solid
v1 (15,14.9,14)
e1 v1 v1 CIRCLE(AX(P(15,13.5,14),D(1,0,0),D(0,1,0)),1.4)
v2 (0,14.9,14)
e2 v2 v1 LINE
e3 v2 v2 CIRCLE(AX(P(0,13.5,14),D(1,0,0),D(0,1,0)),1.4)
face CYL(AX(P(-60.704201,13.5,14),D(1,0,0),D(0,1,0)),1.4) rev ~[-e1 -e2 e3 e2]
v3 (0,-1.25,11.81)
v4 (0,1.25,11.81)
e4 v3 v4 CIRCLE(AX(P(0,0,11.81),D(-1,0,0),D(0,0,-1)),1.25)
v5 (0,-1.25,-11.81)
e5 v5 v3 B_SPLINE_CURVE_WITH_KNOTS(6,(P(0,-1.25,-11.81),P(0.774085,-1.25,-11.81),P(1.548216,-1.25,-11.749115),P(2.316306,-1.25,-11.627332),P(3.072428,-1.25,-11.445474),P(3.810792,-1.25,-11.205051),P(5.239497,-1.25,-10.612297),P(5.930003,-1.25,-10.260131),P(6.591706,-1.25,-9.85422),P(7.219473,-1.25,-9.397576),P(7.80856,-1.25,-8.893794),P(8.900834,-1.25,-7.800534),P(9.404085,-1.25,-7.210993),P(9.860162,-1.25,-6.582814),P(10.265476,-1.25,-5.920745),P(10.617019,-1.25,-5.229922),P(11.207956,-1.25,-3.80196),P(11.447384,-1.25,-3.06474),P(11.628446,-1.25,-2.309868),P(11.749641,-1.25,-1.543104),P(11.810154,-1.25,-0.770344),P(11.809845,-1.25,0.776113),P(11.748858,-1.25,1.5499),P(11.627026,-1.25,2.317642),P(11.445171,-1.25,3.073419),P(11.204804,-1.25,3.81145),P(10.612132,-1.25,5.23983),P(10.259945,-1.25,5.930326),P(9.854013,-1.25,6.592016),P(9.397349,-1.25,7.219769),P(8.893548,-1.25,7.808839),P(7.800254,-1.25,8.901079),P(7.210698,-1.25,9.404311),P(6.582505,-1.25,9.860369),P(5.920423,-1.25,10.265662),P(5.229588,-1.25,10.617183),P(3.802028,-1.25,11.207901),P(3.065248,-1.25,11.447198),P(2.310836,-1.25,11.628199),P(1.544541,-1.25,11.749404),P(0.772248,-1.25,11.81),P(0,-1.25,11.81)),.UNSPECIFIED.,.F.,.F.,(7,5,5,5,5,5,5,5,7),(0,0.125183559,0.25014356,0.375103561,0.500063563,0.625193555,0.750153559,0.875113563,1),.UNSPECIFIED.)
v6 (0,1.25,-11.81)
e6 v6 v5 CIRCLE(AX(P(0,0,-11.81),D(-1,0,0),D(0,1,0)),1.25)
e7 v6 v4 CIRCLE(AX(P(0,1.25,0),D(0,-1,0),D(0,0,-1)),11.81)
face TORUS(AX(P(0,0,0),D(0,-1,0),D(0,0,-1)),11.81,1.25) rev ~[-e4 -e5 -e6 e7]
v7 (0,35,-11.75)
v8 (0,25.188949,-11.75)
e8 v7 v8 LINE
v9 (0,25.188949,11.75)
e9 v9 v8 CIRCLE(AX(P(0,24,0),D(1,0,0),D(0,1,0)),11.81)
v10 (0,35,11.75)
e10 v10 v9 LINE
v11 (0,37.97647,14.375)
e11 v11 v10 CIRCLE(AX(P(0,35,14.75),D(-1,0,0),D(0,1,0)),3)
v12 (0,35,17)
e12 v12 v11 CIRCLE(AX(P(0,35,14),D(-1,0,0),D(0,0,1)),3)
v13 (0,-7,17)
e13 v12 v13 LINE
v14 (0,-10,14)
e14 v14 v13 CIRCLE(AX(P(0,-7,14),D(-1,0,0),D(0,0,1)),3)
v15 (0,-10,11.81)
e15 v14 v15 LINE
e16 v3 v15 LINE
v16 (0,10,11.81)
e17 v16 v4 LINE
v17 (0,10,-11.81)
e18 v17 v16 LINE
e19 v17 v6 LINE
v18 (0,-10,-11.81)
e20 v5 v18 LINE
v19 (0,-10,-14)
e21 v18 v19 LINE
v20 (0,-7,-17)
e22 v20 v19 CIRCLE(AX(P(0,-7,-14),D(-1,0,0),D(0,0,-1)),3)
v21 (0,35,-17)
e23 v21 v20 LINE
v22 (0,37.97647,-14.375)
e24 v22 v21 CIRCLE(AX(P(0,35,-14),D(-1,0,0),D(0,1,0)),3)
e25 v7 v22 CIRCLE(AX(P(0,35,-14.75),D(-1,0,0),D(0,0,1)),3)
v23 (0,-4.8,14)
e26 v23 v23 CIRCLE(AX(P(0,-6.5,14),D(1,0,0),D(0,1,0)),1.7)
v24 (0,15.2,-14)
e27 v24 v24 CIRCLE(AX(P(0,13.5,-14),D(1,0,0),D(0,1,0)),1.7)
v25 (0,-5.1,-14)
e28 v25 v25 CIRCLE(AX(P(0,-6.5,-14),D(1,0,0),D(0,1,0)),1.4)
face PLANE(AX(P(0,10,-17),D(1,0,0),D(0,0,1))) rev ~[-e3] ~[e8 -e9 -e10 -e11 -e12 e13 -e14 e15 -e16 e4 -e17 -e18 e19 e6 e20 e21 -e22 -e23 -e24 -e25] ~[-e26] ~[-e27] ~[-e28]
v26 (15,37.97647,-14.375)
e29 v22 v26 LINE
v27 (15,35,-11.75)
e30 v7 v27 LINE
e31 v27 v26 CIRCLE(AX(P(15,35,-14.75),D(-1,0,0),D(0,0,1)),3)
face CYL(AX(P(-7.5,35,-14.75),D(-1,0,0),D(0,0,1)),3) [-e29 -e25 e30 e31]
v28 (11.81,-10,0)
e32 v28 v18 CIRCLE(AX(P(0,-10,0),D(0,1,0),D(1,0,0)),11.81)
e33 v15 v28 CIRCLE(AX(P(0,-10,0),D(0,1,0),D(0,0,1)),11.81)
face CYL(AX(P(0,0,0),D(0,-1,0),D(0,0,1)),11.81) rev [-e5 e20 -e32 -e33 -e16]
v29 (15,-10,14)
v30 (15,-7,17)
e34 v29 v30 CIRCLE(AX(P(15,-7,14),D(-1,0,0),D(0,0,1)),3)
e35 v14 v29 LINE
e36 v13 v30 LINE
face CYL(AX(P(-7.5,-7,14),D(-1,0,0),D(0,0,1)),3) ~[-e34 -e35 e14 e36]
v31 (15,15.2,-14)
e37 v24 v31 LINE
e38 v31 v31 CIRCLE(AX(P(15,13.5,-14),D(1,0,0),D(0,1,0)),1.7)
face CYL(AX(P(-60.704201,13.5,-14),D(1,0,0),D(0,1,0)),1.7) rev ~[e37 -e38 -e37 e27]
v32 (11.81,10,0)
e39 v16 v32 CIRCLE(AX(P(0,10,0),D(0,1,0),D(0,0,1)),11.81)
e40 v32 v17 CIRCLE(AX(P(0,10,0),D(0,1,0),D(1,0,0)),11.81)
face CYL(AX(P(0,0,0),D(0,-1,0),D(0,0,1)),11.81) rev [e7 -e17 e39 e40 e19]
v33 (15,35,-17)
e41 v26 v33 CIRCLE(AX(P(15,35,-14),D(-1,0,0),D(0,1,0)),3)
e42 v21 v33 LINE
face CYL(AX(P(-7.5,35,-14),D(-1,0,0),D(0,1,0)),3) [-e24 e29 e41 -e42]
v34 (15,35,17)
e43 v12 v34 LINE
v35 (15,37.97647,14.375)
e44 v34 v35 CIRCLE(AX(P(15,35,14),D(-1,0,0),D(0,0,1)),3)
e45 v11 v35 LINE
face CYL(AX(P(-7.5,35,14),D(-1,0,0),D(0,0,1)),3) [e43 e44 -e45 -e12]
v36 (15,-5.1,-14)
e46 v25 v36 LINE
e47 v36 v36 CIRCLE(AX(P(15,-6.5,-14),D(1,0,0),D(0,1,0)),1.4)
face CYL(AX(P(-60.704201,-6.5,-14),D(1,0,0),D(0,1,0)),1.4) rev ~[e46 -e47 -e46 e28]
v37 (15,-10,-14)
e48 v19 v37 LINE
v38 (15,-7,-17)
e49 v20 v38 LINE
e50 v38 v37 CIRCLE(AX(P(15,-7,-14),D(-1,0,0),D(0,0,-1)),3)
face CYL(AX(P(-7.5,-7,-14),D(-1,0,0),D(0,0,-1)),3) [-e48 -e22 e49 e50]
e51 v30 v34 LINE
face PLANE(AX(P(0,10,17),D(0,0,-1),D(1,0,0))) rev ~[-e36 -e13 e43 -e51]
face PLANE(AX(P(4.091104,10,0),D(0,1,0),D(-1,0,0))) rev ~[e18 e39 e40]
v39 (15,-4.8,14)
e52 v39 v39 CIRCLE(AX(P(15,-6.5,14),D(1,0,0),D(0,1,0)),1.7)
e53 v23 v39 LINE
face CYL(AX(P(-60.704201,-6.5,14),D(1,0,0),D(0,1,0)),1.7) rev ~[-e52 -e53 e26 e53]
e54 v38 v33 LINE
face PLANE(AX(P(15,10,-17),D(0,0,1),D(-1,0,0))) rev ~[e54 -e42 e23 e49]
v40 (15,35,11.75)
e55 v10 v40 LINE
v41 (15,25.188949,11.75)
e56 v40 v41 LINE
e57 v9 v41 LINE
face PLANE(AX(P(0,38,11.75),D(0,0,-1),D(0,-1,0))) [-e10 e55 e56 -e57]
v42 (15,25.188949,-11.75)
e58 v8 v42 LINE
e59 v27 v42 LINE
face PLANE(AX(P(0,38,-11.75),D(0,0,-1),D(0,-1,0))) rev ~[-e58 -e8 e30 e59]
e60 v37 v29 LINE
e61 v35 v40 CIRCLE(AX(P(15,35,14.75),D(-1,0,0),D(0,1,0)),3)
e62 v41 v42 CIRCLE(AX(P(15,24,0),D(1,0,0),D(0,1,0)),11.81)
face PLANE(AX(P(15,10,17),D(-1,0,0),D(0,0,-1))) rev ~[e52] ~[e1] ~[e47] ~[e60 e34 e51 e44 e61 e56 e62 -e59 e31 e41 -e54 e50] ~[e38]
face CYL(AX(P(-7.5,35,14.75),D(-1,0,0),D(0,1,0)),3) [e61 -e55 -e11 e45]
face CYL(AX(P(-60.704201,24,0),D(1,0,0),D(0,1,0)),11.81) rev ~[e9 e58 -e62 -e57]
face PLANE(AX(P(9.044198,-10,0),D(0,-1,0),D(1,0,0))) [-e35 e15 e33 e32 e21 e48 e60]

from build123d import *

# Parameters (mm, degrees)
F1_DEPTH      = 10
F1_DEPTH_BACK = 10
F5_DEPTH      = 28
F8_D          = 23.62
F9_D          = 2.8
F9_ON_F2_D    = 2.8
F10_D         = 3.4
F10_ON_F2_D   = 3.4
F7_W          = 14
F7_H          = 23.5
F11_DEPTH     = 25
F12_T1_DEPTH  = 30


# Not quite as in the source:
# - a fillet or chamfer that OpenCascade refuses, or shapes differently, is made with other operations: its cross-section is extruded or revolved along the edge and cut away or added


with BuildPart() as f1:
    # F0 (on Front) → F1 (new body, two sides)
    with BuildSketch(Plane.XZ) as f1_sk:
        with BuildLine():
            Line((15, 17), (0, 17))
            Line((0, 17), (0, 11.81))
            ThreePointArc((0, 11.81), (8.3509310858, 8.3509310858), (11.81, 0))
            ThreePointArc((11.81, 0), (8.3509310858, -8.3509310858), (0, -11.81))
            Line((0, -11.81), (0, -17))
            Line((0, -17), (15, -17))
            Line((15, -17), (15, 17))
        make_face()
    extrude(amount=F1_DEPTH)
    extrude(f1_sk.sketch, amount=-F1_DEPTH_BACK)

    # F2 (on face) → F3 (revolve, cut)
    with BuildSketch(Plane(origin=(0, 0, 0), x_dir=(0, -1, 0), z_dir=(-1, 0, 0))):
        with BuildLine():
            Line((-1.25, -11.81), (1.25, -11.81))
            ThreePointArc((1.25, -11.81), (0, -10.56), (-1.25, -11.81))
        make_face()
        with BuildLine():
            ThreePointArc((-1.25, -11.81), (0, -13.06), (1.25, -11.81))
            Line((1.25, -11.81), (-1.25, -11.81))
        make_face()
    revolve(axis=Axis((0, 0, 0), (0, -1, 0)), mode=Mode.SUBTRACT)

    # F4 (on face) → F5 (join)
    with BuildSketch(Plane(origin=(0, 10, 0), x_dir=(-1, 0, 0), z_dir=(0, 1, 0))):
        with BuildLine():
            Line((0, -11.81), (0, 11.81))
            ThreePointArc((0, 11.81), (-11.81, 0), (0, -11.81))
        make_face()
        with BuildLine():
            Line((0, 17), (-15, 17))
            Line((-15, 17), (-15, -17))
            Line((-15, -17), (0, -17))
            Line((0, -17), (0, -11.81))
            ThreePointArc((0, -11.81), (-11.81, 0), (0, 11.81))
            Line((0, 11.81), (0, 17))
        make_face()
    extrude(amount=F5_DEPTH)

    # F6: union 

    # F8 (through all)
    with Locations(Plane(origin=(0, 0, 0), x_dir=(0, -1, 0), z_dir=(-1, 0, 0))):
        with Locations((-24, 0)):
            Hole(F8_D / 2)

    # F9 (through all)
    with Locations(Plane(origin=(0, 0, 0), x_dir=(0, -1, 0), z_dir=(-1, 0, 0))):
        with Locations((-13.5, 14)):
            Hole(F9_D / 2)

    # F9 on F2 (through all)
    with Locations(Plane(origin=(0, 0, 0), x_dir=(0, -1, 0), z_dir=(-1, 0, 0))):
        with Locations((6.5, -14)):
            Hole(F9_ON_F2_D / 2)

    # F10 (through all)
    with Locations(Plane(origin=(0, 0, 0), x_dir=(0, -1, 0), z_dir=(-1, 0, 0))):
        with Locations((-13.5, -14)):
            Hole(F10_D / 2)

    # F10 on F2 (through all)
    with Locations(Plane(origin=(0, 0, 0), x_dir=(0, -1, 0), z_dir=(-1, 0, 0))):
        with Locations((6.5, 14)):
            Hole(F10_ON_F2_D / 2)

    # F7 (on face) → F11 (cut)
    with BuildSketch(Plane(origin=(0, 0, 0), x_dir=(0, -1, 0), z_dir=(-1, 0, 0))):
        with Locations((-31, 0)):
            Rectangle(F7_W, F7_H)
    extrude(amount=-F11_DEPTH, mode=Mode.SUBTRACT)

    # F12: fillet of radius 3 on 6 edges, made by hand

    # F12_s2 → F12_t1 (cut)
    with BuildSketch(Plane.YZ.offset(-7.5)):
        with BuildLine():
            ThreePointArc((-7, -17), (-9.1213203436, -16.1213203436), (-10, -14))
            Line((-10, -14), (-10, -17))
            Line((-10, -17), (-7, -17))
        make_face()
        with BuildLine():
            ThreePointArc((-7, 17), (-9.1213203436, 16.1213203436), (-10, 14))
            Line((-10, 14), (-10, 17))
            Line((-10, 17), (-7, 17))
        make_face()
        with BuildLine():
            ThreePointArc((38, -14), (37.1213203436, -16.1213203436), (35, -17))
            Line((35, -17), (38, -17))
            Line((38, -17), (38, -14))
        make_face()
        with BuildLine():
            ThreePointArc((35, 17), (37.1213203436, 16.1213203436), (38, 14))
            Line((38, 14), (38, 17))
            Line((38, 17), (35, 17))
        make_face()
        with BuildLine():
            ThreePointArc((35, -11.75), (37.1213203436, -12.6286796564), (38, -14.75))
            Line((38, -14.75), (38, -11.75))
            Line((38, -11.75), (35, -11.75))
        make_face()
        with BuildLine():
            ThreePointArc((38, 14.75), (37.1213203436, 12.6286796564), (35, 11.75))
            Line((35, 11.75), (38, 11.75))
            Line((38, 11.75), (38, 14.75))
        make_face()
    extrude(amount=F12_T1_DEPTH, mode=Mode.SUBTRACT)


solid = f1.part
